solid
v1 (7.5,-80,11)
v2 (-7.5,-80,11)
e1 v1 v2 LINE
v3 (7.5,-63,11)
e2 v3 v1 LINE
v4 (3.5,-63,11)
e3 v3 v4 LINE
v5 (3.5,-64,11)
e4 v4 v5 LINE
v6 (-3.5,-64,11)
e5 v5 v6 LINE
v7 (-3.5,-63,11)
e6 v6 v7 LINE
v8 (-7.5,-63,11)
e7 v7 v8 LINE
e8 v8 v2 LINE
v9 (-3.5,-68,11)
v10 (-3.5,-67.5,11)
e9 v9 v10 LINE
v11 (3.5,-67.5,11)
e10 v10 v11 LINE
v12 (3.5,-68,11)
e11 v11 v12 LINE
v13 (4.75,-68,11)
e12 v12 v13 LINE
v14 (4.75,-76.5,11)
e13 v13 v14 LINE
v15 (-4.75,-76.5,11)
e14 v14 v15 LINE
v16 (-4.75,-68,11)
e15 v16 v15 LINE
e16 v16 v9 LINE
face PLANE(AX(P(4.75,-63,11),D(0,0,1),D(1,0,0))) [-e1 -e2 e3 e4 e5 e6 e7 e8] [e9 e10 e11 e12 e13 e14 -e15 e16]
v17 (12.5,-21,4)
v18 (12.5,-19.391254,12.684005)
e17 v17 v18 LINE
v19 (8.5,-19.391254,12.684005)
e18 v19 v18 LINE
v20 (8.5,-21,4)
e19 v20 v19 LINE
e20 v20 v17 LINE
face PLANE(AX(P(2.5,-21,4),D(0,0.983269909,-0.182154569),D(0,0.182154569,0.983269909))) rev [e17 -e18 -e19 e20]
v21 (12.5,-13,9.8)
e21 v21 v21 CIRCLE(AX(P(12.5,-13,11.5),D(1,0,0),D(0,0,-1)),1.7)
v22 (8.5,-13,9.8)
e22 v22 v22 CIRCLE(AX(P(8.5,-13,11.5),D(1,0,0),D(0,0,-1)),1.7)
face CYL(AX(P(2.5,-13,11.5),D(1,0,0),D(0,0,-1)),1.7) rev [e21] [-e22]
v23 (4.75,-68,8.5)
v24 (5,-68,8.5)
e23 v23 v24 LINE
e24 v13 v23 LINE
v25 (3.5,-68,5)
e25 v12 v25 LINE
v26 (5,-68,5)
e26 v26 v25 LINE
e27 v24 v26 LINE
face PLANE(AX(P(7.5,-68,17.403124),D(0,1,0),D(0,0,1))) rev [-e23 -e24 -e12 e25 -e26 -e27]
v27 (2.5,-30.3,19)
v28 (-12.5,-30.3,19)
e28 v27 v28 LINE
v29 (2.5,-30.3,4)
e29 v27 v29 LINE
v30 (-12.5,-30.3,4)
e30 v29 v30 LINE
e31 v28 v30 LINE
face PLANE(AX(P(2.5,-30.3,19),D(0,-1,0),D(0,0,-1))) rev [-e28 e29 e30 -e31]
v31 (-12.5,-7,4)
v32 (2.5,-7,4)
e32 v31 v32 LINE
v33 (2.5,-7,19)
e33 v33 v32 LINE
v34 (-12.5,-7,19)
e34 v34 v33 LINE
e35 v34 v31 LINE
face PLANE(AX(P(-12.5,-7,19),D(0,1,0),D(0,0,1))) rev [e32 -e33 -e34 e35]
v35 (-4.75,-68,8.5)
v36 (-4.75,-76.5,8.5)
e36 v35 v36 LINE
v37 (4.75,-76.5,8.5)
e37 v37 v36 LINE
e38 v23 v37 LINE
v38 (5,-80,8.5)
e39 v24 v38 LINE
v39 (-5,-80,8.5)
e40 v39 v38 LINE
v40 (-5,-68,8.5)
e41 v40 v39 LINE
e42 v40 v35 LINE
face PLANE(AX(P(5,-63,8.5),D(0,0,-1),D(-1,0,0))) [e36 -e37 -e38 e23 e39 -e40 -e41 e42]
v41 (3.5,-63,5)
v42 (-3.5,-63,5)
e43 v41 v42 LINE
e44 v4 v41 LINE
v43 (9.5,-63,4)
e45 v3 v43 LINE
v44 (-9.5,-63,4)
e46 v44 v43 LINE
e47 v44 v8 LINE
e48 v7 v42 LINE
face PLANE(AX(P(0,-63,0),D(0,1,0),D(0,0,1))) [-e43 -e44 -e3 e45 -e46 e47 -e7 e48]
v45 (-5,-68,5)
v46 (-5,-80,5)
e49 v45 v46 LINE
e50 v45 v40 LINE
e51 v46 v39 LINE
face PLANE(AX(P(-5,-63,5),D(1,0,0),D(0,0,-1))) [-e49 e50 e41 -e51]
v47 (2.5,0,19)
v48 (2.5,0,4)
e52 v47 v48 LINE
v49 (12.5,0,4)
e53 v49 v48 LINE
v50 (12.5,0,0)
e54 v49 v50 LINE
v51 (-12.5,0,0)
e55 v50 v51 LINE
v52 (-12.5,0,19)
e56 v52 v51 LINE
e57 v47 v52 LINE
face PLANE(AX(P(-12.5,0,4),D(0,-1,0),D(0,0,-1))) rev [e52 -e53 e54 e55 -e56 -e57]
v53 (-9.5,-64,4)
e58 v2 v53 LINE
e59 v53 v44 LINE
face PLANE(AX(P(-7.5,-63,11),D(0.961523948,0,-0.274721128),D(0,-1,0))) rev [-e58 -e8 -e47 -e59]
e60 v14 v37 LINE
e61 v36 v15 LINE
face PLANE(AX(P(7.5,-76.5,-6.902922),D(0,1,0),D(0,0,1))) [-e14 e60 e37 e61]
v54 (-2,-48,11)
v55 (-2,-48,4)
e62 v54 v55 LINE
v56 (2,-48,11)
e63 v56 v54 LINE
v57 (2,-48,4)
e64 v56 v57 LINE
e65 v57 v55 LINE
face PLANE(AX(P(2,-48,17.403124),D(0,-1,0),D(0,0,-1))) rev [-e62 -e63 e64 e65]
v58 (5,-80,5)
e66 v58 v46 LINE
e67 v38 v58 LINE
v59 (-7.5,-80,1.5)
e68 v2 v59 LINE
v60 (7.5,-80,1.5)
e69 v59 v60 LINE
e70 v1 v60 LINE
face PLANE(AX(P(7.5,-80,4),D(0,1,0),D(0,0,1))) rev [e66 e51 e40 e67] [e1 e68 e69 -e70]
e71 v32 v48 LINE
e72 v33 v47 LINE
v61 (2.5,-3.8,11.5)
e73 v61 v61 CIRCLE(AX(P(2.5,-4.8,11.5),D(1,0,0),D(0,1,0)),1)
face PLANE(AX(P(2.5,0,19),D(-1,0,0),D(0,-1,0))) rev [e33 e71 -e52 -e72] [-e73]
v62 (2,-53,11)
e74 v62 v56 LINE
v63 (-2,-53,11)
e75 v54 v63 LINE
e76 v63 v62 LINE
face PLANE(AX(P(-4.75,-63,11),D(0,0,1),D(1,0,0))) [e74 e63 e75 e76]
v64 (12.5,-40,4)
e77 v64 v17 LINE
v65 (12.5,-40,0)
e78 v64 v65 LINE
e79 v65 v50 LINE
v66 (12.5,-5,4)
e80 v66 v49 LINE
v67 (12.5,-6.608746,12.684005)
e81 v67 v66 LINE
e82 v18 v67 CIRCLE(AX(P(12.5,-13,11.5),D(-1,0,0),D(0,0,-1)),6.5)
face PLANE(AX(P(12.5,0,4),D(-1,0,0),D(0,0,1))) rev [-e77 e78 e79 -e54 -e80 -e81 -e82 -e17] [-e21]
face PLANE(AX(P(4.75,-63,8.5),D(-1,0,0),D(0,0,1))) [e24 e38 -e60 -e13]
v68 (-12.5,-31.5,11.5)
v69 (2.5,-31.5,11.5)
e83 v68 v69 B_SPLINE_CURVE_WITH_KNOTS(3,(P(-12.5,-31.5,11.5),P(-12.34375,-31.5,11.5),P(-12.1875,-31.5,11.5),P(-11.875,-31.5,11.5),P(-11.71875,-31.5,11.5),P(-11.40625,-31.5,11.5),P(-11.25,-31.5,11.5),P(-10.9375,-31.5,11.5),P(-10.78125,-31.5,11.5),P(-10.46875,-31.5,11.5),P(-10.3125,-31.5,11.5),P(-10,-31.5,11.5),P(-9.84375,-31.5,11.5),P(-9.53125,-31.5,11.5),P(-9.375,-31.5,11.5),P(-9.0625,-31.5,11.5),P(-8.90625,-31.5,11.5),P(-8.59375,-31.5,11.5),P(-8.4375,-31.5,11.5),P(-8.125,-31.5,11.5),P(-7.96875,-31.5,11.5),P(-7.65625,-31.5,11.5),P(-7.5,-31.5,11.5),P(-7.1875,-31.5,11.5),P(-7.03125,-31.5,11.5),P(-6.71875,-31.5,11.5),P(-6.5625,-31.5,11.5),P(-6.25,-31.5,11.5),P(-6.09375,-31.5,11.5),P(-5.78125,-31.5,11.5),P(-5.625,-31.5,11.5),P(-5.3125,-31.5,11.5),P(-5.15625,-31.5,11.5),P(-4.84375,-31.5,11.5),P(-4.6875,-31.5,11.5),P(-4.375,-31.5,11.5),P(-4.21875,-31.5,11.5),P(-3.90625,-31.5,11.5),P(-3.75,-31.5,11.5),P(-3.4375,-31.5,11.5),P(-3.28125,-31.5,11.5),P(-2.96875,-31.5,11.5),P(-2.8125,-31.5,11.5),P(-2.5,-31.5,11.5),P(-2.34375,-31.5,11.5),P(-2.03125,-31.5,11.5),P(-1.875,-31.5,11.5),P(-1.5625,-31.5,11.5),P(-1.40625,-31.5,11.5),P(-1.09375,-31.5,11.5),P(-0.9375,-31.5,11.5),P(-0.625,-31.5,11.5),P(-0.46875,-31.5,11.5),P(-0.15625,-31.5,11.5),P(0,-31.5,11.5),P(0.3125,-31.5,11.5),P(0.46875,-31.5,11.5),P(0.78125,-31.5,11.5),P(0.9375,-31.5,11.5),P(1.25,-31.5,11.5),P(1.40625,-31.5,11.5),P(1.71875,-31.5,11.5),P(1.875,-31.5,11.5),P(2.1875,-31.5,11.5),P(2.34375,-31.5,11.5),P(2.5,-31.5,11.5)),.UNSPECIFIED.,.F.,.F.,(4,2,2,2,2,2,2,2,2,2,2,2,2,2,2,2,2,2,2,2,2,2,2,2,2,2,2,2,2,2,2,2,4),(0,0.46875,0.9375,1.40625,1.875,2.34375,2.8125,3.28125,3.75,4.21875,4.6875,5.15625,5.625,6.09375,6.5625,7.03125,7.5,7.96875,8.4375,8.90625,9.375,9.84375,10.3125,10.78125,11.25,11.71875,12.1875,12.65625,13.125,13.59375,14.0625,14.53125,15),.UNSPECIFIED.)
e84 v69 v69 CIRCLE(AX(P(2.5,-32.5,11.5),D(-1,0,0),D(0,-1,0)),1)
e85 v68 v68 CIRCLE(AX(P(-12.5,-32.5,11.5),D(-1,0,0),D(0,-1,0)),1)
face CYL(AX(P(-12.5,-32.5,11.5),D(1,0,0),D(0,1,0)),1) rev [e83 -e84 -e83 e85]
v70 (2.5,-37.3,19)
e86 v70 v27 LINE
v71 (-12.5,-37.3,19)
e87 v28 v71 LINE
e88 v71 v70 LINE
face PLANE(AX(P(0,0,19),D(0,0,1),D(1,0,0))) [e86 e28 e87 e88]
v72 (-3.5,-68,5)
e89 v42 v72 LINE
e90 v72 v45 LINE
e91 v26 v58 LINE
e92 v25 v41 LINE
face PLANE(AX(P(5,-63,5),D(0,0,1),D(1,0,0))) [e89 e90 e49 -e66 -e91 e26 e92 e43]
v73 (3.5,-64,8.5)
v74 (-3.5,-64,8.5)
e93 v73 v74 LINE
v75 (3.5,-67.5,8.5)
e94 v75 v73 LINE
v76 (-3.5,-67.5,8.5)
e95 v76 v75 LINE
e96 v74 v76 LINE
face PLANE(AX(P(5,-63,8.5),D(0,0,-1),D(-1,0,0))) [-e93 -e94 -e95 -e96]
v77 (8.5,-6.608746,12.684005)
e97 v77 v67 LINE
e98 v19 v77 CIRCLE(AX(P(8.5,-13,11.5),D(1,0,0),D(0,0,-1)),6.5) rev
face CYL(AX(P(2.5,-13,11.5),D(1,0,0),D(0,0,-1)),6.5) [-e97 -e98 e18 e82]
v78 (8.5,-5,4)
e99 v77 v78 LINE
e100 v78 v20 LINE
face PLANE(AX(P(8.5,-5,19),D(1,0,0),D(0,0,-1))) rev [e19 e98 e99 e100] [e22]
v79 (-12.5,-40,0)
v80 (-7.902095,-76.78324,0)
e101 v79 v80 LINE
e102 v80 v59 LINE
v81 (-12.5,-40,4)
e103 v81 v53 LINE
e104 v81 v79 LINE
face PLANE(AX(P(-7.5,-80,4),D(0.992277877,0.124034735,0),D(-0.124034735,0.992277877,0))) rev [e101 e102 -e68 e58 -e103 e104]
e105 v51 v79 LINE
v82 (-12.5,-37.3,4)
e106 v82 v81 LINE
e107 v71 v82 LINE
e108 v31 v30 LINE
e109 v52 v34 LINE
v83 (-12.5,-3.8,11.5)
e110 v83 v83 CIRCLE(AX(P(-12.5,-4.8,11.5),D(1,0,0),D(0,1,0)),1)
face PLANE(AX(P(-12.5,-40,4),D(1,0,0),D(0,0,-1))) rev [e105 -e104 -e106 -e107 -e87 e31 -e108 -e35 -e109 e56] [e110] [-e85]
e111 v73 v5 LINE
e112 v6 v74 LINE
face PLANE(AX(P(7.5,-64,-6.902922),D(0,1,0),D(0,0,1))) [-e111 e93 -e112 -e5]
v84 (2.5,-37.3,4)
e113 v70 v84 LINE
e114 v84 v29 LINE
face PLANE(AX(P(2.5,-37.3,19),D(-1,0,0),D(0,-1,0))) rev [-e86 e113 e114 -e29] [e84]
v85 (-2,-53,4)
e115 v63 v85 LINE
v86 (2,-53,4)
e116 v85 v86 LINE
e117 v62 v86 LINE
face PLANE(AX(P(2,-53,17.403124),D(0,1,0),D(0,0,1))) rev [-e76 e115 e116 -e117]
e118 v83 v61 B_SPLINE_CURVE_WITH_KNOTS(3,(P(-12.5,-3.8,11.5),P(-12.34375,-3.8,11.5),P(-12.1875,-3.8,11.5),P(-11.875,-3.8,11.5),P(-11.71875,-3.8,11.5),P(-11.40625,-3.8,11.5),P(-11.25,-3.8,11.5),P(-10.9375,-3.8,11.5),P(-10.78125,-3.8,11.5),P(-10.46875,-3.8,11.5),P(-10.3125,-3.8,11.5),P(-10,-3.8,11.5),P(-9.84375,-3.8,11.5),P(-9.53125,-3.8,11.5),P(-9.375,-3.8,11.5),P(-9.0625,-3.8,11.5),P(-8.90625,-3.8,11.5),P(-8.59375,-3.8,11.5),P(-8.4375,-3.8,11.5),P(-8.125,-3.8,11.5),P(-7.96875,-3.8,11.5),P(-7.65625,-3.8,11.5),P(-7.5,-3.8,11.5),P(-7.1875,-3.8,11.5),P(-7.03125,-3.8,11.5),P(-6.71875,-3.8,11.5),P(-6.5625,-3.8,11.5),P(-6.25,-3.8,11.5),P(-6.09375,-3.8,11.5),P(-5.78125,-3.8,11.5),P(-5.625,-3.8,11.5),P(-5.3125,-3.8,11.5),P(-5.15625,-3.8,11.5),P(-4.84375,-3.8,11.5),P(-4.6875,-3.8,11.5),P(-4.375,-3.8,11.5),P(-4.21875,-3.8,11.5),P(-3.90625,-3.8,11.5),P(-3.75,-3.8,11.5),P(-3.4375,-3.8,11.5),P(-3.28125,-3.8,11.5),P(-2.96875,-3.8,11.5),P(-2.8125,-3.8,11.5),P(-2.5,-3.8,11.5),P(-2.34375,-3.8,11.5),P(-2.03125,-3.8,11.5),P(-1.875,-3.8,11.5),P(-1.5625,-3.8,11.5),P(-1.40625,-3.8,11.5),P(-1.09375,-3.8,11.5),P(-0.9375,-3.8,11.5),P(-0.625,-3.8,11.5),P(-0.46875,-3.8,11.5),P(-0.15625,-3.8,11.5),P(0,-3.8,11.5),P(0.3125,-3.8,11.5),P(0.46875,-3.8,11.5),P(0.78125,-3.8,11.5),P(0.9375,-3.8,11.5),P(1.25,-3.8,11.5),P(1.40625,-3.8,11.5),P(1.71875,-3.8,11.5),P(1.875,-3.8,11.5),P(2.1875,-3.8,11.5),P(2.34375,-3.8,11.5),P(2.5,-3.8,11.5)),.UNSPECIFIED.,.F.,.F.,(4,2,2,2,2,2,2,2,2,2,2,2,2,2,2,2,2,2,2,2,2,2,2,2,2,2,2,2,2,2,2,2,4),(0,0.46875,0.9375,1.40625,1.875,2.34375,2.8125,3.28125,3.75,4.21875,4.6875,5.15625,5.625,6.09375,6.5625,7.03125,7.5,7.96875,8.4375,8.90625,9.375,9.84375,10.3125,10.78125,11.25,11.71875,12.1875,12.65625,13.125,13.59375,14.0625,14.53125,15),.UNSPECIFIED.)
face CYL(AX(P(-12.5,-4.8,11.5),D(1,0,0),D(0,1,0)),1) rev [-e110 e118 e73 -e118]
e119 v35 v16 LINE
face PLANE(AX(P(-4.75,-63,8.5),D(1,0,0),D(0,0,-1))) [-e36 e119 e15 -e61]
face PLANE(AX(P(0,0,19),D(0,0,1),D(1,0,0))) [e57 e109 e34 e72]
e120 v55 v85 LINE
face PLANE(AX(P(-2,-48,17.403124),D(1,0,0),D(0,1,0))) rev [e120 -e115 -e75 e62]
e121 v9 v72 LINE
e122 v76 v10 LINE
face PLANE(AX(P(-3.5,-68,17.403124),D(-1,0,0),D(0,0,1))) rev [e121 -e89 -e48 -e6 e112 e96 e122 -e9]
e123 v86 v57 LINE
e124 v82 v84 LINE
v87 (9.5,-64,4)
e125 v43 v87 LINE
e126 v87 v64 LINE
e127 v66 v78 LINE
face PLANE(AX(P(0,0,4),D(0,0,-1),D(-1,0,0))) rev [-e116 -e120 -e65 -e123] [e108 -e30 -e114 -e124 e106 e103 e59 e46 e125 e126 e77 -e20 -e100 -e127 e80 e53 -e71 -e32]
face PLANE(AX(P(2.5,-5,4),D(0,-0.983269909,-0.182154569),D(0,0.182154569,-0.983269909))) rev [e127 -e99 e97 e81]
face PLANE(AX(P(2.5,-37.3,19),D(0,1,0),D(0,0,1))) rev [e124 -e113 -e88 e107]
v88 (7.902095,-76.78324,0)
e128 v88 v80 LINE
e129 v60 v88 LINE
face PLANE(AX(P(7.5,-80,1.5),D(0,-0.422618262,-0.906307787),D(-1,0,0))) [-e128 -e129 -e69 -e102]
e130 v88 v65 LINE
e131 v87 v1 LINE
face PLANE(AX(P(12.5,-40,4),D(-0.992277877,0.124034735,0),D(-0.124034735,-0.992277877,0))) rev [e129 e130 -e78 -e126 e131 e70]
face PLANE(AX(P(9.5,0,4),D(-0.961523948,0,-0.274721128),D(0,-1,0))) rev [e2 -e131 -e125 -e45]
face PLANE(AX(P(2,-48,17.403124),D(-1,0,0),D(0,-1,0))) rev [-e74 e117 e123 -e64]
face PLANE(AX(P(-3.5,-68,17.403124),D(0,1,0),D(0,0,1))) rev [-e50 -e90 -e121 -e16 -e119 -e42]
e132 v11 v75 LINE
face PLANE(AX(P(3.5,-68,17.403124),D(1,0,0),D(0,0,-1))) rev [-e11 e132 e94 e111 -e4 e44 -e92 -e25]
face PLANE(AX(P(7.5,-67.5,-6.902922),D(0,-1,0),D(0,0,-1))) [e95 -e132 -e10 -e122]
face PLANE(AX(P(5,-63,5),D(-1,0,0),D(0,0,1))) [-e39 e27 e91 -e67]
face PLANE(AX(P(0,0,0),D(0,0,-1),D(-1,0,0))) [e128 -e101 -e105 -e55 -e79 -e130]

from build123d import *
from OCP.BRepFilletAPI import BRepFilletAPI_MakeChamfer

# Parameters (mm, degrees)
RESSALTO_EXTRUS_O1_DEPTH = 4
ESBO_O2_W                = 15
ESBO_O2_H                = 7
ESBO_O2_W_2              = 4
ESBO_O2_H_2              = 16
RESSALTO_EXTRUS_O2_DEPTH = 15
ESBO_O3_R                = 1
CORTE_EXTRUS_O1_DEPTH    = 84.582294776
ESBO_O10_R               = 1.7
CORTE_EXTRUS_O4_DEPTH    = 10
RESSALTO_EXTRUS_O3_DEPTH = 17
RESSALTO_EXTRUS_O4_REACH = 84.348
ESBO_O7_W                = 4
ESBO_O7_H                = 5
ESBO_O8_W                = 15
ESBO_O8_H                = 3.5
RESSALTO_EXTRUS_O5_DEPTH = 2.5
CHANFRO2_SIZE            = 7
CHANFRO2_SIZE_2          = 2
CHANFRO3_SIZE            = 1.5
CHANFRO3_SIZE2           = 3.216760381


with BuildPart() as part:
    # Esboço1 → Ressalto-extrusão1 (new body)
    with BuildSketch(Plane.XY):
        Polygon((-12.5, 0), (12.5, 0), (12.5, -40), (7.5, -80), (-7.5, -80), (-12.5, -40), align=None)
    extrude(amount=RESSALTO_EXTRUS_O1_DEPTH)

    # Esboço2 → Ressalto-extrusão2 (add)
    with BuildSketch(Plane.XY.offset(4)):
        with Locations((-5, -33.8)):
            Rectangle(ESBO_O2_W, ESBO_O2_H)
        with Locations((-5, -3.5)):
            Rectangle(ESBO_O2_W, ESBO_O2_H)
        with Locations((10.5, -13)):
            Rectangle(ESBO_O2_W_2, ESBO_O2_H_2)
    extrude(amount=RESSALTO_EXTRUS_O2_DEPTH)

    # Esboço3 → Corte-extrusão1 (cut, through all)
    with BuildSketch(Plane(origin=(2.5, 0, 0), x_dir=(0, 0, -1), z_dir=(1, 0, 0))):
        with Locations(Location((-11.5, -4.8, 0), (0, 0, 90))):
            Circle(ESBO_O3_R)
        with Locations(Location((-11.5, -32.5, 0), (0, 0, 90))):
            Circle(ESBO_O3_R)
    extrude(amount=-CORTE_EXTRUS_O1_DEPTH, mode=Mode.SUBTRACT)

    # Esboço10 → Corte-extrusão4 (cut)
    with BuildSketch(Plane(origin=(12.5, 0, 0), x_dir=(0, 0, -1), z_dir=(1, 0, 0))):
        with Locations((-11.5, -13)):
            Circle(ESBO_O10_R)
        with BuildLine():
            Line((-4, -5), (-19, -5))
            Line((-19, -5), (-19, -21))
            Line((-19, -21), (-4, -21))
            Line((-4, -21), (-12.684004699, -19.391254405))
            ThreePointArc((-12.684004699, -19.391254405), (-18, -13), (-12.684004699, -6.608745595))
            Line((-12.684004699, -6.608745595), (-4, -5))
        make_face()
    extrude(amount=-CORTE_EXTRUS_O4_DEPTH, mode=Mode.SUBTRACT)

    # Esboço6 → Ressalto-extrusão3 (add)
    with BuildSketch(Plane.XZ.offset(80)):
        Polygon((-5, 5), (-5, 8.5), (-4.75, 8.5), (-4.75, 11), (-7.5, 11), (-7.5, 4), (7.5, 4), (7.5, 11), (4.75, 11), (4.75, 8.5), (5, 8.5), (5, 5), align=None)
    extrude(amount=-RESSALTO_EXTRUS_O3_DEPTH)

    # Ressalto-extrusão4: up to this face of the body (flat: up to its plane)
    ressalto_extrus_o4_end = Plane(part.part.faces().sort_by_distance((-6.125, -71.5, 11))[0])
    # Esboço7 → Ressalto-extrusão4 (add, up to the picked face)
    with BuildSketch(Plane.XY.offset(4), mode=Mode.PRIVATE) as ressalto_extrus_o4_sk1:
        with Locations((0, -50.5)):
            Rectangle(ESBO_O7_W, ESBO_O7_H)
    ressalto_extrus_o4_tool1 = split(extrude(ressalto_extrus_o4_sk1.sketch, amount=RESSALTO_EXTRUS_O4_REACH, mode=Mode.PRIVATE), bisect_by=ressalto_extrus_o4_end, keep=Keep.BOTH, mode=Mode.PRIVATE)
    # Esboço7 → Ressalto-extrusão4 (add, up to the picked face)
    with BuildSketch(Plane.XY.offset(4), mode=Mode.PRIVATE) as ressalto_extrus_o4_sk2:
        with Locations((5.5, -65.5)):
            Rectangle(ESBO_O7_W, ESBO_O7_H)
    ressalto_extrus_o4_tool2 = split(extrude(ressalto_extrus_o4_sk2.sketch, amount=RESSALTO_EXTRUS_O4_REACH, mode=Mode.PRIVATE), bisect_by=ressalto_extrus_o4_end, keep=Keep.BOTH, mode=Mode.PRIVATE)
    # Esboço7 → Ressalto-extrusão4 (add, up to the picked face)
    with BuildSketch(Plane.XY.offset(4), mode=Mode.PRIVATE) as ressalto_extrus_o4_sk3:
        with Locations((-5.5, -65.5)):
            Rectangle(ESBO_O7_W, ESBO_O7_H)
    ressalto_extrus_o4_tool3 = split(extrude(ressalto_extrus_o4_sk3.sketch, amount=RESSALTO_EXTRUS_O4_REACH, mode=Mode.PRIVATE), bisect_by=ressalto_extrus_o4_end, keep=Keep.BOTH, mode=Mode.PRIVATE)
    add(ressalto_extrus_o4_tool1.solids().sort_by(Axis((0, -50.5, 4), (0, 0, 1)))[0])
    add(ressalto_extrus_o4_tool2.solids().sort_by(Axis((5.5, -65.5, 4), (0, 0, 1)))[0])
    add(ressalto_extrus_o4_tool3.solids().sort_by(Axis((-5.5, -65.5, 4), (0, 0, 1)))[0])

    # Esboço8 → Ressalto-extrusão5 (add)
    with BuildSketch(Plane.XY.offset(11)):
        with Locations((0, -78.25)):
            Rectangle(ESBO_O8_W, ESBO_O8_H)
        with Locations((0, -65.75)):
            Rectangle(ESBO_O8_W, ESBO_O8_H)
    extrude(amount=-RESSALTO_EXTRUS_O5_DEPTH)

    # Chanfro2
    chanfro2_edges_1 = [part.edges().sort_by_distance(p)[0] for p in [
        (7.5, -71.5, 4),
    ]]
    chanfro2_side_1 = [part.faces().sort_by_distance(p)[0] for p in [
        (7.5, -71.5, 4.04),
    ]]
    chanfro2_edges_2 = [part.edges().sort_by_distance(p)[0] for p in [
        (-7.5, -71.5, 4),
    ]]
    chanfro2_side_2 = [part.faces().sort_by_distance(p)[0] for p in [
        (-7.5, -71.5, 4.04),
    ]]
    chanfro2 = BRepFilletAPI_MakeChamfer(part.part.solid().wrapped)
    for e in chanfro2_edges_1:
        chanfro2.Add(CHANFRO2_SIZE - 0.0001, CHANFRO2_SIZE_2 - 0.0001, e.wrapped, chanfro2_side_1[0].wrapped)
    for e in chanfro2_edges_2:
        chanfro2.Add(CHANFRO2_SIZE - 0.0001, CHANFRO2_SIZE_2 - 0.0001, e.wrapped, chanfro2_side_2[0].wrapped)
    add(Compound.cast(chanfro2.Shape()), mode=Mode.REPLACE)  # a hair under: the kernel refuses the full size

    # Chanfro3
    chanfro3_edges = [part.edges().sort_by_distance(p)[0] for p in [
        (0, -80, 0),
    ]]
    chanfro3_side = [part.faces().sort_by_distance(p)[0] for p in [
        (7.313989248, -80, 10.99995),
    ]]
    chamfer(chanfro3_edges, length=CHANFRO3_SIZE, length2=CHANFRO3_SIZE2, reference=chanfro3_side[0])


solid = part.part
